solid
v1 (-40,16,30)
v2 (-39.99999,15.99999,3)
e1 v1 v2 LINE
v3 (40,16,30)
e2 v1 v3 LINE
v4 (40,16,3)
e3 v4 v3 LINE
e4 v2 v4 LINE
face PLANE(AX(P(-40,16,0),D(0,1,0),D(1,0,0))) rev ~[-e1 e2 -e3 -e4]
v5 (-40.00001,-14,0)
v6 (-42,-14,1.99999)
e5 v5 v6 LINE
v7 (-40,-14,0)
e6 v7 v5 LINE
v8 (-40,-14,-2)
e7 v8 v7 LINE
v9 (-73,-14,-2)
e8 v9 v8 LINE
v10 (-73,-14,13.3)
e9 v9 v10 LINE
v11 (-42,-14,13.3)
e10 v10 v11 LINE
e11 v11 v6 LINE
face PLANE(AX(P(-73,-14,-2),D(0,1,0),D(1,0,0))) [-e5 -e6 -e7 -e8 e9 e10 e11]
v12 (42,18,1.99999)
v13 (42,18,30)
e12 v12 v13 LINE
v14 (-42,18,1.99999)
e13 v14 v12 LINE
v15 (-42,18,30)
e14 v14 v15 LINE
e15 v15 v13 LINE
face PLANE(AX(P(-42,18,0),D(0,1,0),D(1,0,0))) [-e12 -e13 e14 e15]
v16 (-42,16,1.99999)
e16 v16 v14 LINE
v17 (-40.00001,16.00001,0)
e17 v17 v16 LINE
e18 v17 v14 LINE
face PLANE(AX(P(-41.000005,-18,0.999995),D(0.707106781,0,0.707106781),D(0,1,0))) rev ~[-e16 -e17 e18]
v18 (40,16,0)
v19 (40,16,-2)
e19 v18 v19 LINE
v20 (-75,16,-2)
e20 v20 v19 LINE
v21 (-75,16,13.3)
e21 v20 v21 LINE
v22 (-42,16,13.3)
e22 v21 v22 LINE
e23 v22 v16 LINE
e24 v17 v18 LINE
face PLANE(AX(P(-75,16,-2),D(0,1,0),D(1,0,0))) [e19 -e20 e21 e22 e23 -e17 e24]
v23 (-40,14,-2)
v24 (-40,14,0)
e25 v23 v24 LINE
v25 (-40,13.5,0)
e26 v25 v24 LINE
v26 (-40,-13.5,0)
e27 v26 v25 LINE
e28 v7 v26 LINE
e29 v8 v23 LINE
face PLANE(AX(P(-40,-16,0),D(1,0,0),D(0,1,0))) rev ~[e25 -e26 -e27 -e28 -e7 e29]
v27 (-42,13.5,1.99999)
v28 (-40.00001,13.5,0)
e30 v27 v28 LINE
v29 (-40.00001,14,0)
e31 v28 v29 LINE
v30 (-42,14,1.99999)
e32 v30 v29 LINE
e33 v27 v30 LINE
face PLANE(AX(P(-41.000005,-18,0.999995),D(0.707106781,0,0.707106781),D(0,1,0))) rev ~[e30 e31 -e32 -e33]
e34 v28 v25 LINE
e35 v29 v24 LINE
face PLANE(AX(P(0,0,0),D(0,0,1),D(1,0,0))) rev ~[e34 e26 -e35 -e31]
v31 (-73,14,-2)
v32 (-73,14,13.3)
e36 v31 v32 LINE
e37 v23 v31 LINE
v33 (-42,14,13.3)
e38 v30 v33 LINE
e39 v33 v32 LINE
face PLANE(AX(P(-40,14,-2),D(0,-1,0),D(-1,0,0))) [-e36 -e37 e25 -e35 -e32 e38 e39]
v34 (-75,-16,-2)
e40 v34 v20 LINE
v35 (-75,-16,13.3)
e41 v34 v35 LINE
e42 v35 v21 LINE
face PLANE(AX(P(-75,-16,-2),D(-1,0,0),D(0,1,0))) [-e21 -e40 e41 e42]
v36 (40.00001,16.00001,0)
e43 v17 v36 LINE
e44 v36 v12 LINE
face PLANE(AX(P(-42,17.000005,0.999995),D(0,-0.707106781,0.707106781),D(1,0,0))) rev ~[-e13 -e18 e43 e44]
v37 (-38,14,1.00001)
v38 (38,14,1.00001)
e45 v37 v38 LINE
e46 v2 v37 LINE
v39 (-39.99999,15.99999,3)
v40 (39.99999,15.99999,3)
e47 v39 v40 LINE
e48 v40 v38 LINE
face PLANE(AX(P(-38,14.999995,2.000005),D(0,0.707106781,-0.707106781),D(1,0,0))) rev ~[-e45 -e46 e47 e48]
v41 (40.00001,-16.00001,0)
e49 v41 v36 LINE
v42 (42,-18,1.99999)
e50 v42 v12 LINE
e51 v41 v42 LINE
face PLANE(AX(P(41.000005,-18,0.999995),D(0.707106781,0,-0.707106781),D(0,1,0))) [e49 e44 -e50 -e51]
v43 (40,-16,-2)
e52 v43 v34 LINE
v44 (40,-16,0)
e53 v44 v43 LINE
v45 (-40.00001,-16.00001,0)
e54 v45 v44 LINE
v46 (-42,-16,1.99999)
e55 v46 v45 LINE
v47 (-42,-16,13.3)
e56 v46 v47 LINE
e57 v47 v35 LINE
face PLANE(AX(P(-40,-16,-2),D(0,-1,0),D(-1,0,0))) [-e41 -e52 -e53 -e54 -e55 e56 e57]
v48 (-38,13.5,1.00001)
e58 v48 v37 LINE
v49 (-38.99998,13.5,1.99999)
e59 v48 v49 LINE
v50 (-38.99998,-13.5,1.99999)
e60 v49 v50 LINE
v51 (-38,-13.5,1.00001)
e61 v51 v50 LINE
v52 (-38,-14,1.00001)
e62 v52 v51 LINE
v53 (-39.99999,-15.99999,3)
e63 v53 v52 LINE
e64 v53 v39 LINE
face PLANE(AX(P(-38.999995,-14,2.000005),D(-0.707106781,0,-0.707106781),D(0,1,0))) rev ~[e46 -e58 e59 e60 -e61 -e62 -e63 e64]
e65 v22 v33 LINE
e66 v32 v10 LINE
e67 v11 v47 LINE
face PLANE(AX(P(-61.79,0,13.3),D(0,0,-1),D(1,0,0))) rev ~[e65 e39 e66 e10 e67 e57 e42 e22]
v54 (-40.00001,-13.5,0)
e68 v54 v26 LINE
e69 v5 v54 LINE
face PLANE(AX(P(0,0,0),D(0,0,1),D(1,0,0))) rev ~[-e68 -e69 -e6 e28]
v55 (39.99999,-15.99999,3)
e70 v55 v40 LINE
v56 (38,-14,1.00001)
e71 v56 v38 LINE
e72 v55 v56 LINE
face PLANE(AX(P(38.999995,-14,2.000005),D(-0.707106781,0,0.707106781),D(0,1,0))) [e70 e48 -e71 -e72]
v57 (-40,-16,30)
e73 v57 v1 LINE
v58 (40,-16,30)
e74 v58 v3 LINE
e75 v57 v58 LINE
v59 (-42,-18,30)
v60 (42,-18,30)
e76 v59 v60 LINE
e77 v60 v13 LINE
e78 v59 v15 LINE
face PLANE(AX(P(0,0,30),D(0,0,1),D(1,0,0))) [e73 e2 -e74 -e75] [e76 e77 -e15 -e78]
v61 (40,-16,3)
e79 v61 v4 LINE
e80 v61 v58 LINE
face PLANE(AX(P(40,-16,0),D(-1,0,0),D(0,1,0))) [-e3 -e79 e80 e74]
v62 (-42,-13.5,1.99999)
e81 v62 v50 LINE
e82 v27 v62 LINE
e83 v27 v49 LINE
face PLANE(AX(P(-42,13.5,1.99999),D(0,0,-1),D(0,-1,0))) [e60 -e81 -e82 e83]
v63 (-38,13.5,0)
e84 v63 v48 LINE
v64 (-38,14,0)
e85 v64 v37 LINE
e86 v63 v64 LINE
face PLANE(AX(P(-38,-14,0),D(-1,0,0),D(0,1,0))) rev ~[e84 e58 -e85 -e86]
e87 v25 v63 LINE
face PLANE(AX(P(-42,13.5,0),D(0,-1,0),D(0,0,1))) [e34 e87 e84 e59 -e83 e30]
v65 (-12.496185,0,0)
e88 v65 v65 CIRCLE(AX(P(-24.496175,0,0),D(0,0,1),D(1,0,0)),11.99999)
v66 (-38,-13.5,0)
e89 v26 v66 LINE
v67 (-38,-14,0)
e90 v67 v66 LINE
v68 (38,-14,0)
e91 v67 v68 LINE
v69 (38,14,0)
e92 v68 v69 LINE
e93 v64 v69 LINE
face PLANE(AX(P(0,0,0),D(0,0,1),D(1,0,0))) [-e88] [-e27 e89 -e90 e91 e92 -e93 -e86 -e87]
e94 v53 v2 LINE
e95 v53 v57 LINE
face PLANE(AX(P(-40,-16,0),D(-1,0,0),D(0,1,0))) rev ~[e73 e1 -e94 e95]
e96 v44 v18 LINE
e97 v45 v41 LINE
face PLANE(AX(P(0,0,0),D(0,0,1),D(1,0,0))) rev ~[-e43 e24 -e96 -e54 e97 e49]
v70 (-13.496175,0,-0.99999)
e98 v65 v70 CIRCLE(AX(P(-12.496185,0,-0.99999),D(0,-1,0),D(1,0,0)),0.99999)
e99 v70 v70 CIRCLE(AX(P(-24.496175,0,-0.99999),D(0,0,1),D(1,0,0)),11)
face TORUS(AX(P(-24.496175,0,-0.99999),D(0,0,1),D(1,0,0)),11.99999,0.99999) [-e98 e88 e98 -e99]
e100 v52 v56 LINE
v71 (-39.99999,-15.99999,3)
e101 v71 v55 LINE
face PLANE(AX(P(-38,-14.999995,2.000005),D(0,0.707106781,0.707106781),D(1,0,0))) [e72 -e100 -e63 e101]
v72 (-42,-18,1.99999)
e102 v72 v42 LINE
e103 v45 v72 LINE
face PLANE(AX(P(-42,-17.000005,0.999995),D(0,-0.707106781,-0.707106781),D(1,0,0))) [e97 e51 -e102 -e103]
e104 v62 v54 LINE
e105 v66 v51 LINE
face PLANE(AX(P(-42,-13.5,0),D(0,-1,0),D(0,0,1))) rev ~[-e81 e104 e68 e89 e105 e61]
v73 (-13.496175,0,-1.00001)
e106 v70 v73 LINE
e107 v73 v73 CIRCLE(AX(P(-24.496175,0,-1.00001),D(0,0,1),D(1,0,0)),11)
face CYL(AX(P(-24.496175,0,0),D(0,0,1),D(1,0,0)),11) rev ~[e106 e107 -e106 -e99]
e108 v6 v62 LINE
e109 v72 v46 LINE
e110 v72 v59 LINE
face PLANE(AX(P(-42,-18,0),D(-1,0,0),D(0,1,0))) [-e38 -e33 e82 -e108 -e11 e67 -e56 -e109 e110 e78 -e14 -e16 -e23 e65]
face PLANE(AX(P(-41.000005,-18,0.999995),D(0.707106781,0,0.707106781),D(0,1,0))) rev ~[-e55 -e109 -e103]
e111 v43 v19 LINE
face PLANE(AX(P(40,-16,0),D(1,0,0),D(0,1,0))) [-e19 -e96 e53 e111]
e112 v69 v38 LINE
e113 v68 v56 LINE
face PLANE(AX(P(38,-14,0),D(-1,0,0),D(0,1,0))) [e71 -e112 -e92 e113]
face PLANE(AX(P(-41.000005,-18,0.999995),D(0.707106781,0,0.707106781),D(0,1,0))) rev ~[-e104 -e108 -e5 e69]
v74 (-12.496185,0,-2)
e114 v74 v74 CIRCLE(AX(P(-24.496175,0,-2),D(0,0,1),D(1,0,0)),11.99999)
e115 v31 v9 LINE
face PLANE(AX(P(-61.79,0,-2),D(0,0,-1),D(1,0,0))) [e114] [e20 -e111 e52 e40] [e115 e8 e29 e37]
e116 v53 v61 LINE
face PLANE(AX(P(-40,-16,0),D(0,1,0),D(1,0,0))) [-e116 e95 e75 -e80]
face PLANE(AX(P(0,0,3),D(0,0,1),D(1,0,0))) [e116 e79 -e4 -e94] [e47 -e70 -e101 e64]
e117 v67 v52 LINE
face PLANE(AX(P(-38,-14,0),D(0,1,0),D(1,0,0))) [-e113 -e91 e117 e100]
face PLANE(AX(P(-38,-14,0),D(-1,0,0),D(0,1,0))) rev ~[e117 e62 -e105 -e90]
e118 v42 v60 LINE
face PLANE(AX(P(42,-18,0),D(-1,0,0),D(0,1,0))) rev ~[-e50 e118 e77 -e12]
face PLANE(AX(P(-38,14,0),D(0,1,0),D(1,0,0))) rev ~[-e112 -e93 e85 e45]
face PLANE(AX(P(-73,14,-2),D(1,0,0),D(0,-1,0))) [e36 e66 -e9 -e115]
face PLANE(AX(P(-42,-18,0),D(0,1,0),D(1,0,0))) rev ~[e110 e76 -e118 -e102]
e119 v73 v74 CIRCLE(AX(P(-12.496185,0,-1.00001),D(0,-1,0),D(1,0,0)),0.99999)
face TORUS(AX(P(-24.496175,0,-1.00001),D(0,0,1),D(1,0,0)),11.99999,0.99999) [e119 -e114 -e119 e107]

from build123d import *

# Parameters (mm, degrees)
F0_W     = 84
F0_H     = 36
F0_W_2   = 80
F0_H_2   = 32
F1_DEPTH = 30
F0_W_3   = 76
F0_H_3   = 28
F2_DEPTH = 3
F0_R     = 11
F3_DEPTH = 2
F4_SIZE  = 1.99999
F5_SIZE  = 1.99999
F6_W     = 27
F6_H     = 1.99999
F7_DEPTH = 5
F9_DEPTH = 15.3
F10_R    = 0.99999


# Not quite as in the source:
# - a fillet or chamfer is up to 0.001 mm smaller than in the source, because OpenCascade refuses the exact size


with BuildPart() as f1:
    # F0 (on Top) → F1 (new body)
    with BuildSketch(Plane.XY):
        Rectangle(F0_W, F0_H)
        Rectangle(F0_W_2, F0_H_2, mode=Mode.SUBTRACT)
    extrude(amount=F1_DEPTH)

    # F0 (on Top) → F2 (join)
    with BuildSketch(Plane.XY):
        Rectangle(F0_W_2, F0_H_2)
        Rectangle(F0_W_3, F0_H_3, mode=Mode.SUBTRACT)
    extrude(amount=F2_DEPTH)

    # F0 (on Top) → F3 (join)
    with BuildSketch(Plane.XY):
        Rectangle(F0_W_2, F0_H_2)
        Rectangle(F0_W_3, F0_H_3, mode=Mode.SUBTRACT)
        Rectangle(F0_W_3, F0_H_3)
        with Locations((-24.4961753488, 0)):
            Circle(F0_R, mode=Mode.SUBTRACT)
    extrude(amount=-F3_DEPTH)

    # F4 (size 2 in the source; OpenCascade refuses exactly that, so slightly less here)
    f4_edges = [f1.edges().sort_by_distance(p)[0] for p in [
        (0, 18, 0),
        (0, -18, 0),
        (42, 0, 0),
        (-42, 0, 0),
    ]]
    chamfer(f4_edges, length=F4_SIZE)

    # F5 (size 2 in the source; OpenCascade refuses exactly that, so slightly less here)
    f5_edges = [f1.edges().sort_by_distance(p)[0] for p in [
        (0, -14, 3),
        (38, 0, 3),
        (0, 14, 3),
        (-38, 0, 3),
    ]]
    chamfer(f5_edges, length=F5_SIZE)

    # F6 (on face) → F7 (cut)
    with BuildSketch(Plane(origin=(-42, 0, 0), x_dir=(0, -1, 0), z_dir=(-1, 0, 0))):
        with Locations((0, 0.999995)):
            Rectangle(F6_W, F6_H)
    extrude(amount=-F7_DEPTH, mode=Mode.SUBTRACT)

    # F8 (on face) → F9 (join)
    with BuildSketch(Plane(origin=(0, 0, -2), x_dir=(1, 0, 0), z_dir=(0, 0, -1))):
        Polygon((-40, 14), (-40, 16), (-75, 16), (-75, -16), (-40, -16), (-40, -14), (-73, -14), (-73, 14), align=None)
    extrude(amount=-F9_DEPTH)

    # F10 (radius 1 in the source; OpenCascade refuses exactly that, so slightly less here)
    f10_edges = [f1.edges().sort_by_distance(p)[0] for p in [
        (-35.496175, 0, -2),
        (-35.496175, 0, 0),
    ]]
    fillet(f10_edges, radius=F10_R)


solid = f1.part
